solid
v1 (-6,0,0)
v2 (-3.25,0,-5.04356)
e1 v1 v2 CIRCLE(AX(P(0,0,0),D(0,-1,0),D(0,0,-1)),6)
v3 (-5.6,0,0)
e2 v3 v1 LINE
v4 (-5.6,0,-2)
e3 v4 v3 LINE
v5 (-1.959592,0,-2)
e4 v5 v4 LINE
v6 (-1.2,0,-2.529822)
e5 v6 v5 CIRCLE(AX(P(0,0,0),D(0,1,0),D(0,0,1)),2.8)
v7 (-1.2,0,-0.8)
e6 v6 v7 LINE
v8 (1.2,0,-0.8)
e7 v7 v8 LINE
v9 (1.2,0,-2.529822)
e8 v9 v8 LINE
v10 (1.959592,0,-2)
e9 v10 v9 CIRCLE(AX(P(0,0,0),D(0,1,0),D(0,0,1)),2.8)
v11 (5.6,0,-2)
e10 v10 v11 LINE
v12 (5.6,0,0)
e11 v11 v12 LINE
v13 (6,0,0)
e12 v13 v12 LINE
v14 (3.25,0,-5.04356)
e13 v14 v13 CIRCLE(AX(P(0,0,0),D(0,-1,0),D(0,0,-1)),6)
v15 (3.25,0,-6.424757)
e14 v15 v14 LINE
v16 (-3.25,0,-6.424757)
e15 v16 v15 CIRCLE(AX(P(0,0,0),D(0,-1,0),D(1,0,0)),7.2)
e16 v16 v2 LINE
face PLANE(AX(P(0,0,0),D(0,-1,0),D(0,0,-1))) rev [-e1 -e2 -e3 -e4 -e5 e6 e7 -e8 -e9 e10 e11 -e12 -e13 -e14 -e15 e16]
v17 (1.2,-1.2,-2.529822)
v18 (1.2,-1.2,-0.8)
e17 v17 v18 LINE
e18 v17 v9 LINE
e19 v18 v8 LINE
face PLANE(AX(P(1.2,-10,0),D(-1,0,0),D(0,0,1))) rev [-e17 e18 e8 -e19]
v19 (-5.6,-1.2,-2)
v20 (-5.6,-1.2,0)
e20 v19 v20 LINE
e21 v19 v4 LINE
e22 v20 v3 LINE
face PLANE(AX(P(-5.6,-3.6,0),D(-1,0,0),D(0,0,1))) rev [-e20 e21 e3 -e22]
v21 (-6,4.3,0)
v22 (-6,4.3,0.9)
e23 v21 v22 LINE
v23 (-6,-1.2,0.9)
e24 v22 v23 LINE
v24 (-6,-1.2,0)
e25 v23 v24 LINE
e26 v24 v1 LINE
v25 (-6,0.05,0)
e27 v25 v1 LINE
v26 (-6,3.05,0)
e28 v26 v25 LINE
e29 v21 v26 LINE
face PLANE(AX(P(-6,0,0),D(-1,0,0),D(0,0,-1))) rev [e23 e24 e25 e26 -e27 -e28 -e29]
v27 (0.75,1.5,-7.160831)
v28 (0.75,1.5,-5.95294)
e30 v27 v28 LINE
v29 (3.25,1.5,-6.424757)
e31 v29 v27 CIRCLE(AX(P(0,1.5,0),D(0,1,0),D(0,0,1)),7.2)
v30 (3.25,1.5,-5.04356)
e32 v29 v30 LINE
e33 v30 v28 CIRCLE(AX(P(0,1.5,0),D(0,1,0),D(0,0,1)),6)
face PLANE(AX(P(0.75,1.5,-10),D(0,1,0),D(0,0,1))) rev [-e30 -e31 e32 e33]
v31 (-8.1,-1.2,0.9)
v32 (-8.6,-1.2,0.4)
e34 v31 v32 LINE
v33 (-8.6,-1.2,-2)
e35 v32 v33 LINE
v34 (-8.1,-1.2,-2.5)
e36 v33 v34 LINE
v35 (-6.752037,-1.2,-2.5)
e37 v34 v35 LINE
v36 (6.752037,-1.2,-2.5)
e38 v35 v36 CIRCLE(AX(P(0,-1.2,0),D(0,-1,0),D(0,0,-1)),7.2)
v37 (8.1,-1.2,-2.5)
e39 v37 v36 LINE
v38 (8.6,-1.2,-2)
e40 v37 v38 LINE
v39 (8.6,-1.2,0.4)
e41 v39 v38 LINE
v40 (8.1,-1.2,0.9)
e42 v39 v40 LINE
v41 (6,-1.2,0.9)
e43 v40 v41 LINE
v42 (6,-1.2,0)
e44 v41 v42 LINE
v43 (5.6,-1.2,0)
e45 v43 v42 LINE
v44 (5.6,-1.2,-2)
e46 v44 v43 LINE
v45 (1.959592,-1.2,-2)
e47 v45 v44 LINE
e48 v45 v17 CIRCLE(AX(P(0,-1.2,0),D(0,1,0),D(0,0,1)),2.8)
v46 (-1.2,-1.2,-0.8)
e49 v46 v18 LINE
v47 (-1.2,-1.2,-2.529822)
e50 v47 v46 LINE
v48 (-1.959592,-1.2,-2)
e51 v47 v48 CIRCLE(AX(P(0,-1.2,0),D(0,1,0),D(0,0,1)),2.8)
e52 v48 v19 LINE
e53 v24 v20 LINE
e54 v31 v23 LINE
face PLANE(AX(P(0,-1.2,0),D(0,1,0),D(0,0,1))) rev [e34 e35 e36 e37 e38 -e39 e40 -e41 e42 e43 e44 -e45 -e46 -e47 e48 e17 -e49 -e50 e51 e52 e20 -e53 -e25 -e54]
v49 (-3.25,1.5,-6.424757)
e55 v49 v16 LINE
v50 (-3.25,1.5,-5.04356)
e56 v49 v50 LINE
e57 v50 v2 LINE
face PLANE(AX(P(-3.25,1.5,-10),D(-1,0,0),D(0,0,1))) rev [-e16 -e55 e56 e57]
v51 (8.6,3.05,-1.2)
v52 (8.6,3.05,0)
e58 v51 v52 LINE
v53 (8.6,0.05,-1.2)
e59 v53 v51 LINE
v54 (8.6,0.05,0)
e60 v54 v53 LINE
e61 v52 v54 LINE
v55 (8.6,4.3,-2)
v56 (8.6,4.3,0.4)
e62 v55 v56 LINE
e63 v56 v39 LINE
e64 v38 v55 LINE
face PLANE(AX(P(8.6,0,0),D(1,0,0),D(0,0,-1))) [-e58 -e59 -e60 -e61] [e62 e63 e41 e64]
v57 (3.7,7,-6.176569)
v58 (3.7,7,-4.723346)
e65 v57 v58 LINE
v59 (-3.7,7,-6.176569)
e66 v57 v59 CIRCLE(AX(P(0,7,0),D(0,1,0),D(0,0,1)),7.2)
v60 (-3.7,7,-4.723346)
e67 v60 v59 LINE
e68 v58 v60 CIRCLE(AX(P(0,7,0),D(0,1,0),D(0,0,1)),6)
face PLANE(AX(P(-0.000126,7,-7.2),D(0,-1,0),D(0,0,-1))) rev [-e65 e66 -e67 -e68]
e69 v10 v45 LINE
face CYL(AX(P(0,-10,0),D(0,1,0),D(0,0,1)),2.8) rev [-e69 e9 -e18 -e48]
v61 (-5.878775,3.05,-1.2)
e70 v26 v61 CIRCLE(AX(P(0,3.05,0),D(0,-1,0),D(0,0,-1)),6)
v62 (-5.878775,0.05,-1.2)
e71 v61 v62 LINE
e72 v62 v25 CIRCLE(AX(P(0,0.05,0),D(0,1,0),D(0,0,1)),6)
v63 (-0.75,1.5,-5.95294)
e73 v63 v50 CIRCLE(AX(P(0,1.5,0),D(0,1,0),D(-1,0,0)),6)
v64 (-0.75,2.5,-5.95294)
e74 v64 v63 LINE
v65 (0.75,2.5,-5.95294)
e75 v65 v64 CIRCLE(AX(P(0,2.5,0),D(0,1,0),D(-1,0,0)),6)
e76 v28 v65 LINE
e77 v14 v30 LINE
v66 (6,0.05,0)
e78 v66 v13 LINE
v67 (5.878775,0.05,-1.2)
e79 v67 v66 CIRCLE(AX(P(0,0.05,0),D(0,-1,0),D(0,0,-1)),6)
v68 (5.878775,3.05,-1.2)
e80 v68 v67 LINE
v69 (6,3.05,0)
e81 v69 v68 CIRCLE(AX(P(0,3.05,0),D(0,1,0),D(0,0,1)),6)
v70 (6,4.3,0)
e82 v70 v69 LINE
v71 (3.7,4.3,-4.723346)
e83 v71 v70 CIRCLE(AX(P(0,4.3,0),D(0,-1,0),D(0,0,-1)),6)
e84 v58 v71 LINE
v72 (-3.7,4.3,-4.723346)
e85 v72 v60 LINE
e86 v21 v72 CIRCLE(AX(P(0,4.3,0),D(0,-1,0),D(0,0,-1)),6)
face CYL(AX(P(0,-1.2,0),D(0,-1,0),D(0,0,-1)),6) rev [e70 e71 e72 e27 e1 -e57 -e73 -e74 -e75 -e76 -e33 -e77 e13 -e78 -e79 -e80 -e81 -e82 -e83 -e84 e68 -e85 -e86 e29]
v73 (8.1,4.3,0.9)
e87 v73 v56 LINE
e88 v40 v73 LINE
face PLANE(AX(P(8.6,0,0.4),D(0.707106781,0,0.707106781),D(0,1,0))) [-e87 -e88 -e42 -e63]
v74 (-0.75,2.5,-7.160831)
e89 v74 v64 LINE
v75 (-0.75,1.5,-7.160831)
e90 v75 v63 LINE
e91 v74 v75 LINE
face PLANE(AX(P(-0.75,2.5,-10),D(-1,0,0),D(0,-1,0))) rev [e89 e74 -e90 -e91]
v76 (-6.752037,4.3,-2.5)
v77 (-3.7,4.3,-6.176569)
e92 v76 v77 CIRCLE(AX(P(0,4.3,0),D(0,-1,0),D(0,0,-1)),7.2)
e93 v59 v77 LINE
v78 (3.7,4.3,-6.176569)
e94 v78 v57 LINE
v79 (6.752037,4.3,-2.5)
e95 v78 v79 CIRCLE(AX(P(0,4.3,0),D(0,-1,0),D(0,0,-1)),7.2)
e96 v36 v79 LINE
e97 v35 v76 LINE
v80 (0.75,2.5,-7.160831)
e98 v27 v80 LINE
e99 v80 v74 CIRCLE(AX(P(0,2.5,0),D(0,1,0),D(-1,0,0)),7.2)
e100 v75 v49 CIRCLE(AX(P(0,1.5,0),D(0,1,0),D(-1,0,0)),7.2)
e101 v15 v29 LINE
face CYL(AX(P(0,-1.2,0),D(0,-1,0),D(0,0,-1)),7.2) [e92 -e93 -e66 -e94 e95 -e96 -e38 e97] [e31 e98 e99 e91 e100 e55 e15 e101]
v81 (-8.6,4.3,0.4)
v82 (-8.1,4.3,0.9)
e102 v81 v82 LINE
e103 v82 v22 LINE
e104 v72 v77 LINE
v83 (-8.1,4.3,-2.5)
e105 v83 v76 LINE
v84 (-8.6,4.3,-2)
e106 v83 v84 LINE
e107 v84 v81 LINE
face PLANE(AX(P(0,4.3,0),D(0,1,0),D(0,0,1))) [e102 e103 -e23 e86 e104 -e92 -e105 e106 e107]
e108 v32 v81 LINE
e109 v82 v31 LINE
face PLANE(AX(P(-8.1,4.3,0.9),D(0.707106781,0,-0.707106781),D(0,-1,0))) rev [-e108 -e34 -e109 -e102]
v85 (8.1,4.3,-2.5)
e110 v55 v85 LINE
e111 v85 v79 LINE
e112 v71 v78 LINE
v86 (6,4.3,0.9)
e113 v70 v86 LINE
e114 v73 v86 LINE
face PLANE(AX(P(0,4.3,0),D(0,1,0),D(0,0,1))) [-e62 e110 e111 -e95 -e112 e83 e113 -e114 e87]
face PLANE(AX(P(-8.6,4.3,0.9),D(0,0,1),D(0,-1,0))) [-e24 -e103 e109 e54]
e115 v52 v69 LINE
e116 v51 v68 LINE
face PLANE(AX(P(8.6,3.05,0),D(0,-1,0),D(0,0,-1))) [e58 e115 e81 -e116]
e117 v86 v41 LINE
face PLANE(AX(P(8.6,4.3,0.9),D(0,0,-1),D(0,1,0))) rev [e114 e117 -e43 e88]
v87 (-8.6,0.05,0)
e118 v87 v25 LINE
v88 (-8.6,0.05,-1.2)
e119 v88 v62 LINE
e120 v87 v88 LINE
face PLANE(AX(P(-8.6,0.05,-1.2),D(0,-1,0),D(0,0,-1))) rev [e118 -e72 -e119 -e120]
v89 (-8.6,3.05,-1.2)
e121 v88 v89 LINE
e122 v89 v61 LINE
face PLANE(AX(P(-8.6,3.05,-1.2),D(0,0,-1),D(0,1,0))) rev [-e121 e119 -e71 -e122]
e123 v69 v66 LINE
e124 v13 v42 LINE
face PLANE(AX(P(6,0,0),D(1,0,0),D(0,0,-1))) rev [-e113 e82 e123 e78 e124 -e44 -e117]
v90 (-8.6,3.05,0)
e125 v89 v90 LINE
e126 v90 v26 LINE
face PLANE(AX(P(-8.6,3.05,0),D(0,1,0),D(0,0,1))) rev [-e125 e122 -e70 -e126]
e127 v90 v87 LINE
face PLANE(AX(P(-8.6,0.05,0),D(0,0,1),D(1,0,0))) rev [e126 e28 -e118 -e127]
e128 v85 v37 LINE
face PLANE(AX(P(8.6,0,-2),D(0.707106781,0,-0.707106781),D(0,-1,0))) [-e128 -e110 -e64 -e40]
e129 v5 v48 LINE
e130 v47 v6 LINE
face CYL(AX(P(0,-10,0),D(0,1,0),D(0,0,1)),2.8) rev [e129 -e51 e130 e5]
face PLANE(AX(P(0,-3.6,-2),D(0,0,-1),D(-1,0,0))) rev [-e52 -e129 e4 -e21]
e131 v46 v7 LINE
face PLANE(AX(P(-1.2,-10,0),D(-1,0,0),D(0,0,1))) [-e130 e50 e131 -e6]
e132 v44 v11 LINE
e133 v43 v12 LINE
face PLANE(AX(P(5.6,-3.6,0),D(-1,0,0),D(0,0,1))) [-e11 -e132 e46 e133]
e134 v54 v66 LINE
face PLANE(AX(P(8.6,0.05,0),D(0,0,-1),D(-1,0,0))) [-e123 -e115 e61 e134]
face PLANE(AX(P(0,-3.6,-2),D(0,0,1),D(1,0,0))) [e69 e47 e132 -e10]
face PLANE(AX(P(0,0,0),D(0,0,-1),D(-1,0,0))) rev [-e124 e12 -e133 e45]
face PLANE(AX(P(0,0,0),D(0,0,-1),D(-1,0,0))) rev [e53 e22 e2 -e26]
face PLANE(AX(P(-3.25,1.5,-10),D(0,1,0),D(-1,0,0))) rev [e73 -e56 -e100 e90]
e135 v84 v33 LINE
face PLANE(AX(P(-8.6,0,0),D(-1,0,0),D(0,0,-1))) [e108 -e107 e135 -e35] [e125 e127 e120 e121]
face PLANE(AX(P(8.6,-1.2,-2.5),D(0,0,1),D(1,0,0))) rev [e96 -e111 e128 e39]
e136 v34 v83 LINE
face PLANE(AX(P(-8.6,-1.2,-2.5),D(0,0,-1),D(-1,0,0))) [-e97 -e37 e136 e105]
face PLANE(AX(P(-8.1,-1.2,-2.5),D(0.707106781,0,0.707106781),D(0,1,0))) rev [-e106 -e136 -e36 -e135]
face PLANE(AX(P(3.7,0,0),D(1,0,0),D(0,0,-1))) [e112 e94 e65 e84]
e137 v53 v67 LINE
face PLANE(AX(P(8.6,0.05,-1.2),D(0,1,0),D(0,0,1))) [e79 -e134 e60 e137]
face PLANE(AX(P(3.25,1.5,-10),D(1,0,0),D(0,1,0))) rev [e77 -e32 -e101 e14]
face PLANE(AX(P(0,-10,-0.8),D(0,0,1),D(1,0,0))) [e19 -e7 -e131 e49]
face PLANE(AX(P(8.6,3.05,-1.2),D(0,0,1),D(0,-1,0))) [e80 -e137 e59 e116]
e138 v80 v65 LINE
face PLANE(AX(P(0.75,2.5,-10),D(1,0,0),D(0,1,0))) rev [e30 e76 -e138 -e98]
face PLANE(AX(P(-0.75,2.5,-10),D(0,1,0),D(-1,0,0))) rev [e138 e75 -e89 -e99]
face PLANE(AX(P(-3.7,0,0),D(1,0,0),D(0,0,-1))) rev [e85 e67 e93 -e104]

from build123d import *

# Parameters (mm, degrees)
SKETCH1_W                = 6
SKETCH1_H                = 1.2
SKETCH1_W_2              = 1.2
SKETCH1_H_2              = 4.3
REVOLVE1_ANGLE           = 180
REVOLVE2_START           = 4.3
REVOLVE2_DEPTH           = 2.7
CUT_EXTRUDE1_DEPTH       = 10
CUT_EXTRUDE2_DEPTH       = 10
SKETCH9_W                = 3.4
SKETCH9_H                = 5.5
SKETCH9_W_2              = 1.2
SKETCH9_H_2              = 3
BOSS_EXTRUDE5_DEPTH      = 2.6
SKETCH11_W               = 1.2
SKETCH11_H               = 3
CUT_EXTRUDE3_DEPTH       = 3.6
CHAMFER2_SIZE            = 0.5
CHAMFER3_SIZE            = 0.5
CHAMFER2_OF_MIRROR2_SIZE = 0.5
CHAMFER3_OF_MIRROR2_SIZE = 0.5
SKETCH5_W                = 4
SKETCH5_H                = 2
CUT_EXTRUDE4_DEPTH       = 3.6


# Read off the part's stored shape, not the designer's step: Revolve2
with BuildPart() as part:
    # Sketch1 → Revolve1 (revolve)
    with BuildSketch(Plane.XY):
        with Locations((3, -0.6)):
            Rectangle(SKETCH1_W, SKETCH1_H)
        with Locations((6.6, -0.6)):
            Rectangle(SKETCH1_W_2, SKETCH1_H)
        with Locations((6.6, 2.15)):
            Rectangle(SKETCH1_W_2, SKETCH1_H_2)
    revolve(axis=Axis((0, -1.2, 0), (0, 1, 0)), revolution_arc=REVOLVE1_ANGLE)

    # Revolve2 outline → Revolve2 (add)
    with BuildSketch(Plane(origin=(0, 0, 0), x_dir=(1, 0, 0), z_dir=(0, 1, 0)).offset(REVOLVE2_START)):
        with BuildLine():
            ThreePointArc((3.7, 6.176568627), (0, 7.2), (-3.7, 6.176568627))
            Line((-3.7, 6.176568627), (-3.7, 4.723346271))
            ThreePointArc((-3.7, 4.723346271), (0, 6), (3.7, 4.723346271))
            Line((3.7, 4.723346271), (3.7, 6.176568627))
        make_face()
    extrude(amount=REVOLVE2_DEPTH)

    # Sketch3 → Cut-Extrude1 (cut)
    with BuildSketch(Plane.XY):
        Polygon((-3.25, 1.5), (-0.75, 1.5), (-0.75, 2.5), (0.75, 2.5), (0.75, 1.5), (3.25, 1.5), (3.25, 0), (-3.25, 0), align=None)
    extrude(amount=-CUT_EXTRUDE1_DEPTH, mode=Mode.SUBTRACT)

    # Sketch4 → Cut-Extrude2 (cut)
    with BuildSketch(Plane(origin=(0, 0, 0), x_dir=(1, 0, 0), z_dir=(0, 1, 0))):
        with BuildLine():
            Line((-1.2, 0.8), (-1.2, 2.529822128))
            ThreePointArc((-1.2, 2.529822128), (-2.366431913, 1.496662955), (-2.8, 0))
            Line((-2.8, 0), (2.8, 0))
            ThreePointArc((2.8, 0), (2.366431913, 1.496662955), (1.2, 2.529822128))
            Line((1.2, 2.529822128), (1.2, 0.8))
            Line((1.2, 0.8), (-1.2, 0.8))
        make_face()
    extrude(amount=-CUT_EXTRUDE2_DEPTH, mode=Mode.SUBTRACT)

    # Sketch9 → Boss-Extrude5 (add)
    with BuildSketch(Plane(origin=(6, 0, 0), x_dir=(0, 0, -1), z_dir=(1, 0, 0))):
        with Locations((0.8, 1.55)):
            Rectangle(SKETCH9_W, SKETCH9_H)
        with Locations((0.6, 1.55)):
            Rectangle(SKETCH9_W_2, SKETCH9_H_2, mode=Mode.SUBTRACT)
    boss_extrude5 = extrude(amount=BOSS_EXTRUDE5_DEPTH)

    # Sketch11 → Cut-Extrude3 (cut)
    with BuildSketch(Plane(origin=(8.6, 0, 0), x_dir=(0, 0, -1), z_dir=(1, 0, 0))):
        with Locations((0.6, 1.55)):
            Rectangle(SKETCH11_W, SKETCH11_H)
    cut_extrude3 = extrude(amount=-CUT_EXTRUDE3_DEPTH, mode=Mode.SUBTRACT)

    # Chamfer2
    chamfer2_edges = [part.edges().sort_by_distance(p)[0] for p in [
        (8.6, 1.55, 0.9),
    ]]
    chamfer(chamfer2_edges, length=CHAMFER2_SIZE)

    # Chamfer3
    chamfer3_edges = [part.edges().sort_by_distance(p)[0] for p in [
        (8.6, 1.55, -2.5),
    ]]
    chamfer(chamfer3_edges, length=CHAMFER3_SIZE)

    # Mirror2: Boss-Extrude5, Cut-Extrude3 across plane
    add(boss_extrude5.mirror(Plane(origin=(0, 0, 0), x_dir=(0, 0, 1), z_dir=(1, 0, 0))))
    add(cut_extrude3.mirror(Plane(origin=(0, 0, 0), x_dir=(0, 0, 1), z_dir=(1, 0, 0))), mode=Mode.SUBTRACT)

    # Chamfer2 of Mirror2
    chamfer2_of_mirror2_edges = [part.edges().sort_by_distance(p)[0] for p in [
        (-8.6, 1.55, 0.9),
    ]]
    chamfer(chamfer2_of_mirror2_edges, length=CHAMFER2_OF_MIRROR2_SIZE)

    # Chamfer3 of Mirror2
    chamfer3_of_mirror2_edges = [part.edges().sort_by_distance(p)[0] for p in [
        (-8.6, 1.55, -2.5),
    ]]
    chamfer(chamfer3_of_mirror2_edges, length=CHAMFER3_OF_MIRROR2_SIZE)

    # Sketch5 → Cut-Extrude4 (cut)
    with BuildSketch(Plane(origin=(0, 0, 0), x_dir=(1, 0, 0), z_dir=(0, 1, 0))):
        with Locations((-3.6, 1)):
            Rectangle(SKETCH5_W, SKETCH5_H)
        with Locations((3.6, 1)):
            Rectangle(SKETCH5_W, SKETCH5_H)
    extrude(amount=-CUT_EXTRUDE4_DEPTH, mode=Mode.SUBTRACT)


solid = part.part
